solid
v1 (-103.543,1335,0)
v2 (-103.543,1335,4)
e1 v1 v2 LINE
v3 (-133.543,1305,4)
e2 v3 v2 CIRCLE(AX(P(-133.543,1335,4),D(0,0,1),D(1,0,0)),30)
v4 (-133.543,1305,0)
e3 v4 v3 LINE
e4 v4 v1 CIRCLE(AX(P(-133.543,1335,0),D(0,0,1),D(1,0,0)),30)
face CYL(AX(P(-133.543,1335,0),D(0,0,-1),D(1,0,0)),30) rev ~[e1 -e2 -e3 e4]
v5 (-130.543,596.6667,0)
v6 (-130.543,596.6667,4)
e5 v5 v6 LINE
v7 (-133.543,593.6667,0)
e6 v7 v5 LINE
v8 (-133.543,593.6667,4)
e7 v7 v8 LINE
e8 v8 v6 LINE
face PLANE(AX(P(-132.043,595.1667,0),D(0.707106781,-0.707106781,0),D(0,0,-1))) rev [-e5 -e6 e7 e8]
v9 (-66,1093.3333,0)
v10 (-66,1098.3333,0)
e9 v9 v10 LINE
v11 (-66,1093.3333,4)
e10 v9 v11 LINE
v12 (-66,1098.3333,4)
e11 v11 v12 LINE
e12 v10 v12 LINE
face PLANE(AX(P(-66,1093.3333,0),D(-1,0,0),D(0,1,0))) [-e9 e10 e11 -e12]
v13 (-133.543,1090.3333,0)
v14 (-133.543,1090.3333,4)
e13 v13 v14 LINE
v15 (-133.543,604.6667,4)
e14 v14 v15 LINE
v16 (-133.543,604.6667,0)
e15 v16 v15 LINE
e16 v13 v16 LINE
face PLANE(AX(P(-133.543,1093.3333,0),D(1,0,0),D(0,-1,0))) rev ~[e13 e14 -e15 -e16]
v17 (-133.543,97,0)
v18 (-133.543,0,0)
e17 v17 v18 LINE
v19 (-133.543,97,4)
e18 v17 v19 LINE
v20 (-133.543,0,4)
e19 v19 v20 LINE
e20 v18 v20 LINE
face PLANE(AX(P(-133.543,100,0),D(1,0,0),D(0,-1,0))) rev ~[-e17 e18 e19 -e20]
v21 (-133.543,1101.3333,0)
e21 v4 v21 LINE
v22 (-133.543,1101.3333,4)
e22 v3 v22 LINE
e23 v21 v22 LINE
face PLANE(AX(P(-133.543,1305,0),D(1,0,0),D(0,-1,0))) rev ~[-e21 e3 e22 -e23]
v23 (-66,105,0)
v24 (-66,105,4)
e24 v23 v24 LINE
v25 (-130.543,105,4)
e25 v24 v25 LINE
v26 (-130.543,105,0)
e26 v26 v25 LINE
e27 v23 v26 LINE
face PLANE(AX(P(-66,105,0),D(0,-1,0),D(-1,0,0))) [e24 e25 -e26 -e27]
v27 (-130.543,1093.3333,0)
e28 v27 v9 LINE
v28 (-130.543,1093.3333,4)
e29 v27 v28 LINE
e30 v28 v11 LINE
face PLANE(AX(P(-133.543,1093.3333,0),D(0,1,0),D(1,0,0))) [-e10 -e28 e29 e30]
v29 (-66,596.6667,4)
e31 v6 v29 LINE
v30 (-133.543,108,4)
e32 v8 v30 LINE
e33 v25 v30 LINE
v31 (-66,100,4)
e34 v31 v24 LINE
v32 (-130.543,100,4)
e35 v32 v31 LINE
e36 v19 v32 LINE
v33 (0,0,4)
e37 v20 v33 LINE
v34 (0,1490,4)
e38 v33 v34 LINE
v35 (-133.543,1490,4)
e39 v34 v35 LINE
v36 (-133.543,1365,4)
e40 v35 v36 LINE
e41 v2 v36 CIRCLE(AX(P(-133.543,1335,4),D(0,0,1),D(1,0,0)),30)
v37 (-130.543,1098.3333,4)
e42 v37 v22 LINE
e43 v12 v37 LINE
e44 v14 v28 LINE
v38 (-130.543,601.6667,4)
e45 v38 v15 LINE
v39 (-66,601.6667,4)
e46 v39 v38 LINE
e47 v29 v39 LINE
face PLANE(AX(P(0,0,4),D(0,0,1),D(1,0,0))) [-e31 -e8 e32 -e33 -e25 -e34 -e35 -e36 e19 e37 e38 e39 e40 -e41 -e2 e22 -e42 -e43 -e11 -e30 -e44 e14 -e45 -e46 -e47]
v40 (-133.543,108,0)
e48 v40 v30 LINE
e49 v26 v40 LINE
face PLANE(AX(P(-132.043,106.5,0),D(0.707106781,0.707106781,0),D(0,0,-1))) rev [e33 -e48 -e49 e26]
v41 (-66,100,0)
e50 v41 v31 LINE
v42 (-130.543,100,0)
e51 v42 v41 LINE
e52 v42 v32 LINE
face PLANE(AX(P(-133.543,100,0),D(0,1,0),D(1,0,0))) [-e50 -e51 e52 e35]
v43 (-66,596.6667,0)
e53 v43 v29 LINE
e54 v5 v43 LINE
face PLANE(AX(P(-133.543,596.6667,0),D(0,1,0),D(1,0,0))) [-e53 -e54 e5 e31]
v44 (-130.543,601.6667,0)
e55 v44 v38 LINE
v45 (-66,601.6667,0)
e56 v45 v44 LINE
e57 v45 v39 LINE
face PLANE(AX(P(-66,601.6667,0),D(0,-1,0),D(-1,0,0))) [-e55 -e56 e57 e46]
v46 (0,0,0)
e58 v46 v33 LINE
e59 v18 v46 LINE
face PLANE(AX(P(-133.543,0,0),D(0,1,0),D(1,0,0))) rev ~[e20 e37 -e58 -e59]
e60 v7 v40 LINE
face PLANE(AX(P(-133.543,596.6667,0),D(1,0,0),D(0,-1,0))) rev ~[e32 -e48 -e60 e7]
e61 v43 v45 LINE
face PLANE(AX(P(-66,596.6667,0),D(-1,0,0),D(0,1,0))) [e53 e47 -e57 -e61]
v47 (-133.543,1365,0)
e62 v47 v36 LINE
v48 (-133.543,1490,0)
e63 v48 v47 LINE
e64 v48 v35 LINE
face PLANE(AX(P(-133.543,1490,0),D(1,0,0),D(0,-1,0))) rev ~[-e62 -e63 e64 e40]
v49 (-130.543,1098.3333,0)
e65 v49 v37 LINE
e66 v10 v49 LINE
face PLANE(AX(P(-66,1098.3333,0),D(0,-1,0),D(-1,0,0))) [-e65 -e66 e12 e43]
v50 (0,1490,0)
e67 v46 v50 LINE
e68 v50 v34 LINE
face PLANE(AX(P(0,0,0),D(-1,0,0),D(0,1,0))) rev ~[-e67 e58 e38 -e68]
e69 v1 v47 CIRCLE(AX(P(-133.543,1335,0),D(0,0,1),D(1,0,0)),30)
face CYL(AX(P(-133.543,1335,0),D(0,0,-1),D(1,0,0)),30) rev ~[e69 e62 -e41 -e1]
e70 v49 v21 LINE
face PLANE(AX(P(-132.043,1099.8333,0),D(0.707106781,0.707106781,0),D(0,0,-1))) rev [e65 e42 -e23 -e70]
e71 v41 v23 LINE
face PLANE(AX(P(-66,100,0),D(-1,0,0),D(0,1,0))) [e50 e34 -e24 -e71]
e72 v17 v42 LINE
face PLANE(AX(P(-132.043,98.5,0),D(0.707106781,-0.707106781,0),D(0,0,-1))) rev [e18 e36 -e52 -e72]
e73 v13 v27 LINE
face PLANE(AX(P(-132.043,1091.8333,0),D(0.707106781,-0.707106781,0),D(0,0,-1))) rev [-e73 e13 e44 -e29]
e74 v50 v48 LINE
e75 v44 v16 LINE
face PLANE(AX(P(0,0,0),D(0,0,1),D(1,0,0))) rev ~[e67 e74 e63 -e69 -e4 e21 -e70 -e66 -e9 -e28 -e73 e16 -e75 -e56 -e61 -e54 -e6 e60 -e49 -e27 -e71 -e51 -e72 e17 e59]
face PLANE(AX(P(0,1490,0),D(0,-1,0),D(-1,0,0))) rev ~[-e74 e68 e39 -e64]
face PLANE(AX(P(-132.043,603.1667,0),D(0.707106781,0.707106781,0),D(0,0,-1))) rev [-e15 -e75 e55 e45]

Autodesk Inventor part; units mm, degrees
ref_plane "YZ Plane" through (0, 0, 0) normal (1, 0, 0) x (0, 1, 0)
ref_plane "XZ Plane" through (0, 0, 0) normal (0, 1, 0) x (-1, 0, 0)
ref_plane "XY Plane" through (0, 0, 0) normal (0, 0, 1) x (1, 0, 0)
sketch "Sketch1" plane through (0, 0, 0) normal (0, 0, 1) x (1, 0, 0)
  line L0 (0, 1490) -> (-133.543, 1490)
  line L1 (-133.543, 1490) -> (-133.543, 0)
  line L2 (-133.543, 0) -> (0, 0)
  line L3 (0, 0) -> (0, 1490)
  line L4 (-133.543, 100) -> (-66, 100)
  line L5 (-66, 100) -> (-66, 105)
  line L6 (-66, 105) -> (-133.543, 105)
  line L7 (-133.543, 105) -> (-133.543, 100)
  line L8 (-133.543, 596.6667) -> (-66, 596.6667)
  line L9 (-66, 596.6667) -> (-66, 601.6667)
  line L10 (-66, 601.6667) -> (-133.543, 601.6667)
  line L11 (-133.543, 601.6667) -> (-133.543, 596.6667)
  line L12 (-133.543, 1093.3333) -> (-66, 1093.3333)
  line L13 (-66, 1093.3333) -> (-66, 1098.3333)
  line L14 (-66, 1098.3333) -> (-133.543, 1098.3333)
  line L15 (-133.543, 1098.3333) -> (-133.543, 1093.3333)
  circle A0 centre (-133.543, 1335) radius 30
  point P0 (-133.543, 105)
  point P1 (-133.543, 1365)
  point P2 (-133.543, 1305)
  dimension "d0" = 1490
  dimension "d1" = 133.543
  dimension "d2" = 5
  dimension "d4" = 100
  dimension "d7" = 496.6667
  dimension "d23" = 66
  dimension "d29" = 60
  dimension "d30" = 1335
extrude "Plate1" add sketch "Sketch1" along normal blind 4 contours L3 L2 L1 L4 L5 L6 L8 L9 L10 L12 L13 L14 A0 L0
chamfer "Corner Chamfer1" distance 3 angle 45 6 edges at (-133.543, 100, 2) (-133.543, 105, 2) (-133.543, 596.6667, 2) (-133.543, 601.6667, 2) (-133.543, 1098.3333, 2) (-133.543, 1093.3333, 2)
equation "\"d0\" = Стрингер_длина"
equation "\"d1\" = стрингер_глубина_6"
equation "\"d2\" = паз_под_стрингер_толщина"
equation "\"d7\" = Шаг_шпангоутов"
equation "\"d23\" = паз_под_стрингер_глубина - Thickness"
equation "\"d29\" = 2 * радиус_выреза_под_сварку"
equation "\"d12\" = Thickness"
equation "\"BendRadius\" = Thickness"
equation "\"BendReliefWidth\" = Thickness"
equation "\"BendReliefDepth\" = 0.5 * Thickness"
equation "\"CornerReliefSize\" = 4 * Thickness"
equation "\"MinimumRemnant\" = 2 * Thickness"
equation "\"TransitionRadius\" = BendRadius"
equation "\"JacobiRadiusSize\" = BendRadius"
equation "\"GapSize\" = Thickness"
equation "\"Стрингер_длина\" = 1490"
equation "\"стрингер_глубина_6\" = 133.543003"
equation "\"паз_под_стрингер_толщина\" = 5"
equation "\"Шаг_шпангоутов\" = 496.666667"
equation "\"паз_под_стрингер_глубина\" = 70"
equation "\"Thickness\" = 4"
equation "\"радиус_выреза_под_сварку\" = 30"
properties part number "0715 GBK stringer C3" material "Steel"
